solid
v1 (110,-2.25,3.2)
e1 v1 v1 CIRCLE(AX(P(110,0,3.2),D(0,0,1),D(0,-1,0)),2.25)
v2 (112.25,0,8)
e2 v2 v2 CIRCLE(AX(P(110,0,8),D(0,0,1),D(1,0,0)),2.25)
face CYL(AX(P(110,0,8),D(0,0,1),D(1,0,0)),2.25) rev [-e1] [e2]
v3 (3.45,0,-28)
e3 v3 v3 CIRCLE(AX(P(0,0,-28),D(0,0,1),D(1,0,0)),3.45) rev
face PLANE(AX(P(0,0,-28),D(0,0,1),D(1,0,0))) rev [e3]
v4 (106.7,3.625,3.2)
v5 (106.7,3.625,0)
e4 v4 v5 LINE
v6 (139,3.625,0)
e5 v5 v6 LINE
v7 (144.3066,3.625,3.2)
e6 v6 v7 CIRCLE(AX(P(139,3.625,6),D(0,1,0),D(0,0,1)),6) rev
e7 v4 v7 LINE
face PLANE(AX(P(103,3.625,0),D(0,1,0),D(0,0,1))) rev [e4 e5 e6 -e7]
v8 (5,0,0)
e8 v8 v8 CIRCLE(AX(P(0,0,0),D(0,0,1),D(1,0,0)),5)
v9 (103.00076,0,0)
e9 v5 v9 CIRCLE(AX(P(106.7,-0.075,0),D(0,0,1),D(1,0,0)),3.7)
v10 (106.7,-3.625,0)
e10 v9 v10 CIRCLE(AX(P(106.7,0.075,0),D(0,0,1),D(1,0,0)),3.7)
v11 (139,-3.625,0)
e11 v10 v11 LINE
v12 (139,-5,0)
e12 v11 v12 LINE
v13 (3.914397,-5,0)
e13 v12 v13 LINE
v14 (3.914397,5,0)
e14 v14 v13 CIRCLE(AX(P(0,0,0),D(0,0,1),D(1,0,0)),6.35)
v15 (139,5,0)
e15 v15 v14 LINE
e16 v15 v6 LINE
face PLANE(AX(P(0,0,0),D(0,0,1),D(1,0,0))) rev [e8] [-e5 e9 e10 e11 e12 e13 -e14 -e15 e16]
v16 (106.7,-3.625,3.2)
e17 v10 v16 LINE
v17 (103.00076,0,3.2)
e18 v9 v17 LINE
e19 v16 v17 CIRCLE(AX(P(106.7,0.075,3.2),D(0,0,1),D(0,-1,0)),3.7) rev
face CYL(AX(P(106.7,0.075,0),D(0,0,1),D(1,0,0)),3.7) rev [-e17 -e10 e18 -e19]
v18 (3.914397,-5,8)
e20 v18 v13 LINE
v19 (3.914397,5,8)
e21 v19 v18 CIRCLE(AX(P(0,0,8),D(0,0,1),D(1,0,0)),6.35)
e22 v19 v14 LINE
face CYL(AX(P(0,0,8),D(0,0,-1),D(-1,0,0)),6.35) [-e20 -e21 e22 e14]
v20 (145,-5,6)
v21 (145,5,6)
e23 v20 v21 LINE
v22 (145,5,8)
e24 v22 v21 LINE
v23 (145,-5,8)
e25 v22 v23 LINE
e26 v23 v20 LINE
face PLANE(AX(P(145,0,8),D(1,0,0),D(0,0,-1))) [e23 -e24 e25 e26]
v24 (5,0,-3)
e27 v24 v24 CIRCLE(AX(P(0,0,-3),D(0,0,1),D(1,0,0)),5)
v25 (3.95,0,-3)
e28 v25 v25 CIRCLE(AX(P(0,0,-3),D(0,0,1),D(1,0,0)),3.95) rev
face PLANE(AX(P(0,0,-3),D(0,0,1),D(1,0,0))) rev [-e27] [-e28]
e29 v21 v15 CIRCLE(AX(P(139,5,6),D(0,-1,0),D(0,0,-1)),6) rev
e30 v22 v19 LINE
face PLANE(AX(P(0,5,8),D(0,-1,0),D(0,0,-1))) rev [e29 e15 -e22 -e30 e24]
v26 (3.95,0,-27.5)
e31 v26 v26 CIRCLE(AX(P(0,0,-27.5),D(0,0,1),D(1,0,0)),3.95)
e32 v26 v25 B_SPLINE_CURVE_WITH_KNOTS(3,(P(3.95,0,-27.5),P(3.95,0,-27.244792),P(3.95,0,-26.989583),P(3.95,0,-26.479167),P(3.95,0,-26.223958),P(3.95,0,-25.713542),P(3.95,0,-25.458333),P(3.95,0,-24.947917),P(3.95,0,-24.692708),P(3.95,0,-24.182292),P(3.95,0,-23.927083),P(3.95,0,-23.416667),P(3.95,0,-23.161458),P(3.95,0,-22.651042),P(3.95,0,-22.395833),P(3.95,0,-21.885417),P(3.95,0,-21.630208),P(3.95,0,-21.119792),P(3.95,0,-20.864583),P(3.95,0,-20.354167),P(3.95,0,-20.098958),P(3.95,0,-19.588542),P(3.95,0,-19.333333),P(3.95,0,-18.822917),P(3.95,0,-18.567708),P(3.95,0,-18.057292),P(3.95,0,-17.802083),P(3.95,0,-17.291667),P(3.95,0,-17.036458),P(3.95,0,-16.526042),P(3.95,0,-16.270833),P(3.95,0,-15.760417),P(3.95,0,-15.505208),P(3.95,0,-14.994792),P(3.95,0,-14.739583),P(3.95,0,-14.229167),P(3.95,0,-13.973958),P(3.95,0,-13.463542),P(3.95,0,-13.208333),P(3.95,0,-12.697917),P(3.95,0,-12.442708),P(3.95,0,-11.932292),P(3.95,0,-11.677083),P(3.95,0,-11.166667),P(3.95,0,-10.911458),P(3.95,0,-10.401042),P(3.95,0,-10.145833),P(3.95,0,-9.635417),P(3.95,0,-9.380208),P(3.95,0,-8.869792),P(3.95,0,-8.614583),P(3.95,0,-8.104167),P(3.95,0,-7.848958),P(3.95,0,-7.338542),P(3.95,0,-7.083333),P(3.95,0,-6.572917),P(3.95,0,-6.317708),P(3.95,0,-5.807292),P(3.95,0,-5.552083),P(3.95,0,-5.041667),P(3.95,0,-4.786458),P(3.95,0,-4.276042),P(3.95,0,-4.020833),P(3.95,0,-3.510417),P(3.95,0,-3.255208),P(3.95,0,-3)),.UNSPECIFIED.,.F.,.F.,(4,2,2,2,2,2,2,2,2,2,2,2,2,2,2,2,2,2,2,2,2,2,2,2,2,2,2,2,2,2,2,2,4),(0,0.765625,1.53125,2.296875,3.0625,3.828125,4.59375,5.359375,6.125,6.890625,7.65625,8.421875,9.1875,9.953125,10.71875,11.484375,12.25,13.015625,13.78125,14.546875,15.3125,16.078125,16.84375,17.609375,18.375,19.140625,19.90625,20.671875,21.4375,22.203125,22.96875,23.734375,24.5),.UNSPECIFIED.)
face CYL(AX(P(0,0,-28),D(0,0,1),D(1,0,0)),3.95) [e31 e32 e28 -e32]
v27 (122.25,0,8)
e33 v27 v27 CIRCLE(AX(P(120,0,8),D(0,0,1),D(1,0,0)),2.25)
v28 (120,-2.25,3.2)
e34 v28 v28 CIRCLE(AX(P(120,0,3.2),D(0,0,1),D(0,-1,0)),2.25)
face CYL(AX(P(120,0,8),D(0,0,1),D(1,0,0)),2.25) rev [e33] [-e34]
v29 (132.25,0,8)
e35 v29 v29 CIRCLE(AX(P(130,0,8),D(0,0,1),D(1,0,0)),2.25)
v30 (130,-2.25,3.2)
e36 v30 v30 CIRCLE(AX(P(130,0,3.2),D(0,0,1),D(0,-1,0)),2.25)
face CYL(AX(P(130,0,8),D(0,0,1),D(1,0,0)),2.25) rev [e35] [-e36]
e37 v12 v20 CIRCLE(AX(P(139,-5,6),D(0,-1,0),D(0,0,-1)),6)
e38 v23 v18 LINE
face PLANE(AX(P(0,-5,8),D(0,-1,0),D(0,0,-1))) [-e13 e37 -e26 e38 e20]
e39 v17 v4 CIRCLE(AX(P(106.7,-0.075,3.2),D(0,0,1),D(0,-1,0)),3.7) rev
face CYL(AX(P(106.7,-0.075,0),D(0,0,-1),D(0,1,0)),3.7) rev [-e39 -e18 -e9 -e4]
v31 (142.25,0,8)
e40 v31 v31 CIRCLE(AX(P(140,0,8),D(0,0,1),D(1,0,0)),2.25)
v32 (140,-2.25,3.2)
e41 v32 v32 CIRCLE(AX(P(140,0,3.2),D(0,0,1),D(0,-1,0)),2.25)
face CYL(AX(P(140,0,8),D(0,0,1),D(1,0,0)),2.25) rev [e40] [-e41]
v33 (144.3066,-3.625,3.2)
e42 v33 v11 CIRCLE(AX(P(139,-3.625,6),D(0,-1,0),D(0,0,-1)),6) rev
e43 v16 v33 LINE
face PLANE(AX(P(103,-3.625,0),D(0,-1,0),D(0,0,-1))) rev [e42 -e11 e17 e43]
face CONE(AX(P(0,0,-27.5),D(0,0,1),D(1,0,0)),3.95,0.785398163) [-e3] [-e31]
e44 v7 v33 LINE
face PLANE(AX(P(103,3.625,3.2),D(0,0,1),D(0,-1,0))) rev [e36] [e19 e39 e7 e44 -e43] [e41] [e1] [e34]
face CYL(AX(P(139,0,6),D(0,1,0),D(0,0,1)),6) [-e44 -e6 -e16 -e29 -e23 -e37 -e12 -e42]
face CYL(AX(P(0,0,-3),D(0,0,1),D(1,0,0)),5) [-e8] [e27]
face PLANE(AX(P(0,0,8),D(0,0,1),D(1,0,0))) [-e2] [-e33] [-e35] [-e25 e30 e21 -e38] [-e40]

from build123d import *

# Parameters (mm, degrees)
SKETCH1_R            = 3.95
BOSS_EXTRUDE1_DEPTH  = 28
BOSS_EXTRUDE2_START  = 8
BOSS_EXTRUDE2_DEPTH  = 8
SKETCH3_R            = 5
BOSS_EXTRUDE3_DEPTH  = 3
SKETCH5_W            = 3.2
SKETCH5_H            = 7.25
CUT_EXTRUDE1_DEPTH   = 42
M4_CLEARANCE_HOLE1_D = 4.5
CHAMFER1_SIZE        = 0.5
FILLET1_R            = 3.7
FILLET5_R            = 6


with BuildPart() as part:
    # Sketch1 → Boss-Extrude1 (new body)
    with BuildSketch(Plane.XY):
        Circle(SKETCH1_R)
    extrude(amount=-BOSS_EXTRUDE1_DEPTH)

    # Sketch2 → Boss-Extrude2 (add)
    with BuildSketch(Plane.XY.offset(BOSS_EXTRUDE2_START)):
        with BuildLine():
            ThreePointArc((6.35, 0), (5.708717799, 2.780834604), (3.914396505, 5))
            Line((3.914396505, 5), (0, 5))
            Line((0, 5), (0, 3.95))
            ThreePointArc((0, 3.95), (2.793071786, 2.793071786), (3.95, 0))
            ThreePointArc((3.95, 0), (2.793071786, -2.793071786), (0, -3.95))
            Line((0, -3.95), (0, -5))
            Line((0, -5), (3.914396505, -5))
            ThreePointArc((3.914396505, -5), (5.708717799, -2.780834604), (6.35, 0))
        make_face()
        with BuildLine():
            Line((0, 5), (3.914396505, 5))
            ThreePointArc((3.914396505, 5), (-6.35, 0), (3.914396505, -5))
            Line((3.914396505, -5), (0, -5))
            Line((0, -5), (0, -3.95))
            ThreePointArc((0, -3.95), (-3.95, 0), (0, 3.95))
            Line((0, 3.95), (0, 5))
        make_face()
        with BuildLine():
            Line((145, -5), (145, 5))
            Line((145, 5), (3.914396505, 5))
            ThreePointArc((3.914396505, 5), (5.708717799, 2.780834604), (6.35, 0))
            ThreePointArc((6.35, 0), (5.708717799, -2.780834604), (3.914396505, -5))
            Line((3.914396505, -5), (145, -5))
        make_face()
        with BuildLine():
            ThreePointArc((3.95, 0), (2.793071786, 2.793071786), (0, 3.95))
            Line((0, 3.95), (0, -3.95))
            ThreePointArc((0, -3.95), (2.793071786, -2.793071786), (3.95, 0))
        make_face()
        with BuildLine():
            Line((0, -3.95), (0, 3.95))
            ThreePointArc((0, 3.95), (-3.95, 0), (0, -3.95))
        make_face()
    extrude(amount=-BOSS_EXTRUDE2_DEPTH)

    # Sketch3 → Boss-Extrude3 (add)
    with BuildSketch(Plane.XY):
        Circle(SKETCH3_R)
    extrude(amount=-BOSS_EXTRUDE3_DEPTH)

    # Sketch5 → Cut-Extrude1 (cut)
    with BuildSketch(Plane(origin=(145, 0, 0), x_dir=(0, 0, -1), z_dir=(1, 0, 0))):
        with Locations((-1.6, 0)):
            Rectangle(SKETCH5_W, SKETCH5_H)
    extrude(amount=-CUT_EXTRUDE1_DEPTH, mode=Mode.SUBTRACT)

    # M4 Clearance Hole1 (through all)
    with Locations(Plane.XY.offset(8)):
        with Locations((140, 0), (130, 0), (120, 0), (110, 0)):
            Hole(M4_CLEARANCE_HOLE1_D / 2)

    # Chamfer1
    chamfer1_edges = [part.edges().sort_by_distance(p)[0] for p in [
        (-3.95, 0, -28),
    ]]
    chamfer(chamfer1_edges, length=CHAMFER1_SIZE)

    # Fillet1
    # the kernel refuses this fillet: 3.7 mm, written as the material it adds along each edge
    with BuildSketch(Plane(origin=(103, -3.625, 3.2), x_dir=(0, 1, 0), z_dir=(0, 0, -1))) as fillet1_piece_1:
        with BuildLine():
            CenterArc((FILLET1_R, FILLET1_R), FILLET1_R, 180, 90)
            Line((0, FILLET1_R), (0, 0))
            Line((0, 0), (FILLET1_R, 0))
        make_face()
    extrude(amount=3.2)
    with BuildSketch(Plane(origin=(103, 3.625, 0), x_dir=(1, 0, 0), z_dir=(0, 0, 1))) as fillet1_piece_2:
        with BuildLine():
            CenterArc((FILLET1_R, -FILLET1_R), FILLET1_R, 90, 90)
            Line((0, -FILLET1_R), (0, 0))
            Line((0, 0), (FILLET1_R, 0))
        make_face()
    extrude(amount=3.2)

    # Fillet5
    fillet5_edges = [part.edges().sort_by_distance(p)[0] for p in [
        (145, 4.3125, 0),
    ]]
    fillet(fillet5_edges, radius=FILLET5_R)


solid = part.part
